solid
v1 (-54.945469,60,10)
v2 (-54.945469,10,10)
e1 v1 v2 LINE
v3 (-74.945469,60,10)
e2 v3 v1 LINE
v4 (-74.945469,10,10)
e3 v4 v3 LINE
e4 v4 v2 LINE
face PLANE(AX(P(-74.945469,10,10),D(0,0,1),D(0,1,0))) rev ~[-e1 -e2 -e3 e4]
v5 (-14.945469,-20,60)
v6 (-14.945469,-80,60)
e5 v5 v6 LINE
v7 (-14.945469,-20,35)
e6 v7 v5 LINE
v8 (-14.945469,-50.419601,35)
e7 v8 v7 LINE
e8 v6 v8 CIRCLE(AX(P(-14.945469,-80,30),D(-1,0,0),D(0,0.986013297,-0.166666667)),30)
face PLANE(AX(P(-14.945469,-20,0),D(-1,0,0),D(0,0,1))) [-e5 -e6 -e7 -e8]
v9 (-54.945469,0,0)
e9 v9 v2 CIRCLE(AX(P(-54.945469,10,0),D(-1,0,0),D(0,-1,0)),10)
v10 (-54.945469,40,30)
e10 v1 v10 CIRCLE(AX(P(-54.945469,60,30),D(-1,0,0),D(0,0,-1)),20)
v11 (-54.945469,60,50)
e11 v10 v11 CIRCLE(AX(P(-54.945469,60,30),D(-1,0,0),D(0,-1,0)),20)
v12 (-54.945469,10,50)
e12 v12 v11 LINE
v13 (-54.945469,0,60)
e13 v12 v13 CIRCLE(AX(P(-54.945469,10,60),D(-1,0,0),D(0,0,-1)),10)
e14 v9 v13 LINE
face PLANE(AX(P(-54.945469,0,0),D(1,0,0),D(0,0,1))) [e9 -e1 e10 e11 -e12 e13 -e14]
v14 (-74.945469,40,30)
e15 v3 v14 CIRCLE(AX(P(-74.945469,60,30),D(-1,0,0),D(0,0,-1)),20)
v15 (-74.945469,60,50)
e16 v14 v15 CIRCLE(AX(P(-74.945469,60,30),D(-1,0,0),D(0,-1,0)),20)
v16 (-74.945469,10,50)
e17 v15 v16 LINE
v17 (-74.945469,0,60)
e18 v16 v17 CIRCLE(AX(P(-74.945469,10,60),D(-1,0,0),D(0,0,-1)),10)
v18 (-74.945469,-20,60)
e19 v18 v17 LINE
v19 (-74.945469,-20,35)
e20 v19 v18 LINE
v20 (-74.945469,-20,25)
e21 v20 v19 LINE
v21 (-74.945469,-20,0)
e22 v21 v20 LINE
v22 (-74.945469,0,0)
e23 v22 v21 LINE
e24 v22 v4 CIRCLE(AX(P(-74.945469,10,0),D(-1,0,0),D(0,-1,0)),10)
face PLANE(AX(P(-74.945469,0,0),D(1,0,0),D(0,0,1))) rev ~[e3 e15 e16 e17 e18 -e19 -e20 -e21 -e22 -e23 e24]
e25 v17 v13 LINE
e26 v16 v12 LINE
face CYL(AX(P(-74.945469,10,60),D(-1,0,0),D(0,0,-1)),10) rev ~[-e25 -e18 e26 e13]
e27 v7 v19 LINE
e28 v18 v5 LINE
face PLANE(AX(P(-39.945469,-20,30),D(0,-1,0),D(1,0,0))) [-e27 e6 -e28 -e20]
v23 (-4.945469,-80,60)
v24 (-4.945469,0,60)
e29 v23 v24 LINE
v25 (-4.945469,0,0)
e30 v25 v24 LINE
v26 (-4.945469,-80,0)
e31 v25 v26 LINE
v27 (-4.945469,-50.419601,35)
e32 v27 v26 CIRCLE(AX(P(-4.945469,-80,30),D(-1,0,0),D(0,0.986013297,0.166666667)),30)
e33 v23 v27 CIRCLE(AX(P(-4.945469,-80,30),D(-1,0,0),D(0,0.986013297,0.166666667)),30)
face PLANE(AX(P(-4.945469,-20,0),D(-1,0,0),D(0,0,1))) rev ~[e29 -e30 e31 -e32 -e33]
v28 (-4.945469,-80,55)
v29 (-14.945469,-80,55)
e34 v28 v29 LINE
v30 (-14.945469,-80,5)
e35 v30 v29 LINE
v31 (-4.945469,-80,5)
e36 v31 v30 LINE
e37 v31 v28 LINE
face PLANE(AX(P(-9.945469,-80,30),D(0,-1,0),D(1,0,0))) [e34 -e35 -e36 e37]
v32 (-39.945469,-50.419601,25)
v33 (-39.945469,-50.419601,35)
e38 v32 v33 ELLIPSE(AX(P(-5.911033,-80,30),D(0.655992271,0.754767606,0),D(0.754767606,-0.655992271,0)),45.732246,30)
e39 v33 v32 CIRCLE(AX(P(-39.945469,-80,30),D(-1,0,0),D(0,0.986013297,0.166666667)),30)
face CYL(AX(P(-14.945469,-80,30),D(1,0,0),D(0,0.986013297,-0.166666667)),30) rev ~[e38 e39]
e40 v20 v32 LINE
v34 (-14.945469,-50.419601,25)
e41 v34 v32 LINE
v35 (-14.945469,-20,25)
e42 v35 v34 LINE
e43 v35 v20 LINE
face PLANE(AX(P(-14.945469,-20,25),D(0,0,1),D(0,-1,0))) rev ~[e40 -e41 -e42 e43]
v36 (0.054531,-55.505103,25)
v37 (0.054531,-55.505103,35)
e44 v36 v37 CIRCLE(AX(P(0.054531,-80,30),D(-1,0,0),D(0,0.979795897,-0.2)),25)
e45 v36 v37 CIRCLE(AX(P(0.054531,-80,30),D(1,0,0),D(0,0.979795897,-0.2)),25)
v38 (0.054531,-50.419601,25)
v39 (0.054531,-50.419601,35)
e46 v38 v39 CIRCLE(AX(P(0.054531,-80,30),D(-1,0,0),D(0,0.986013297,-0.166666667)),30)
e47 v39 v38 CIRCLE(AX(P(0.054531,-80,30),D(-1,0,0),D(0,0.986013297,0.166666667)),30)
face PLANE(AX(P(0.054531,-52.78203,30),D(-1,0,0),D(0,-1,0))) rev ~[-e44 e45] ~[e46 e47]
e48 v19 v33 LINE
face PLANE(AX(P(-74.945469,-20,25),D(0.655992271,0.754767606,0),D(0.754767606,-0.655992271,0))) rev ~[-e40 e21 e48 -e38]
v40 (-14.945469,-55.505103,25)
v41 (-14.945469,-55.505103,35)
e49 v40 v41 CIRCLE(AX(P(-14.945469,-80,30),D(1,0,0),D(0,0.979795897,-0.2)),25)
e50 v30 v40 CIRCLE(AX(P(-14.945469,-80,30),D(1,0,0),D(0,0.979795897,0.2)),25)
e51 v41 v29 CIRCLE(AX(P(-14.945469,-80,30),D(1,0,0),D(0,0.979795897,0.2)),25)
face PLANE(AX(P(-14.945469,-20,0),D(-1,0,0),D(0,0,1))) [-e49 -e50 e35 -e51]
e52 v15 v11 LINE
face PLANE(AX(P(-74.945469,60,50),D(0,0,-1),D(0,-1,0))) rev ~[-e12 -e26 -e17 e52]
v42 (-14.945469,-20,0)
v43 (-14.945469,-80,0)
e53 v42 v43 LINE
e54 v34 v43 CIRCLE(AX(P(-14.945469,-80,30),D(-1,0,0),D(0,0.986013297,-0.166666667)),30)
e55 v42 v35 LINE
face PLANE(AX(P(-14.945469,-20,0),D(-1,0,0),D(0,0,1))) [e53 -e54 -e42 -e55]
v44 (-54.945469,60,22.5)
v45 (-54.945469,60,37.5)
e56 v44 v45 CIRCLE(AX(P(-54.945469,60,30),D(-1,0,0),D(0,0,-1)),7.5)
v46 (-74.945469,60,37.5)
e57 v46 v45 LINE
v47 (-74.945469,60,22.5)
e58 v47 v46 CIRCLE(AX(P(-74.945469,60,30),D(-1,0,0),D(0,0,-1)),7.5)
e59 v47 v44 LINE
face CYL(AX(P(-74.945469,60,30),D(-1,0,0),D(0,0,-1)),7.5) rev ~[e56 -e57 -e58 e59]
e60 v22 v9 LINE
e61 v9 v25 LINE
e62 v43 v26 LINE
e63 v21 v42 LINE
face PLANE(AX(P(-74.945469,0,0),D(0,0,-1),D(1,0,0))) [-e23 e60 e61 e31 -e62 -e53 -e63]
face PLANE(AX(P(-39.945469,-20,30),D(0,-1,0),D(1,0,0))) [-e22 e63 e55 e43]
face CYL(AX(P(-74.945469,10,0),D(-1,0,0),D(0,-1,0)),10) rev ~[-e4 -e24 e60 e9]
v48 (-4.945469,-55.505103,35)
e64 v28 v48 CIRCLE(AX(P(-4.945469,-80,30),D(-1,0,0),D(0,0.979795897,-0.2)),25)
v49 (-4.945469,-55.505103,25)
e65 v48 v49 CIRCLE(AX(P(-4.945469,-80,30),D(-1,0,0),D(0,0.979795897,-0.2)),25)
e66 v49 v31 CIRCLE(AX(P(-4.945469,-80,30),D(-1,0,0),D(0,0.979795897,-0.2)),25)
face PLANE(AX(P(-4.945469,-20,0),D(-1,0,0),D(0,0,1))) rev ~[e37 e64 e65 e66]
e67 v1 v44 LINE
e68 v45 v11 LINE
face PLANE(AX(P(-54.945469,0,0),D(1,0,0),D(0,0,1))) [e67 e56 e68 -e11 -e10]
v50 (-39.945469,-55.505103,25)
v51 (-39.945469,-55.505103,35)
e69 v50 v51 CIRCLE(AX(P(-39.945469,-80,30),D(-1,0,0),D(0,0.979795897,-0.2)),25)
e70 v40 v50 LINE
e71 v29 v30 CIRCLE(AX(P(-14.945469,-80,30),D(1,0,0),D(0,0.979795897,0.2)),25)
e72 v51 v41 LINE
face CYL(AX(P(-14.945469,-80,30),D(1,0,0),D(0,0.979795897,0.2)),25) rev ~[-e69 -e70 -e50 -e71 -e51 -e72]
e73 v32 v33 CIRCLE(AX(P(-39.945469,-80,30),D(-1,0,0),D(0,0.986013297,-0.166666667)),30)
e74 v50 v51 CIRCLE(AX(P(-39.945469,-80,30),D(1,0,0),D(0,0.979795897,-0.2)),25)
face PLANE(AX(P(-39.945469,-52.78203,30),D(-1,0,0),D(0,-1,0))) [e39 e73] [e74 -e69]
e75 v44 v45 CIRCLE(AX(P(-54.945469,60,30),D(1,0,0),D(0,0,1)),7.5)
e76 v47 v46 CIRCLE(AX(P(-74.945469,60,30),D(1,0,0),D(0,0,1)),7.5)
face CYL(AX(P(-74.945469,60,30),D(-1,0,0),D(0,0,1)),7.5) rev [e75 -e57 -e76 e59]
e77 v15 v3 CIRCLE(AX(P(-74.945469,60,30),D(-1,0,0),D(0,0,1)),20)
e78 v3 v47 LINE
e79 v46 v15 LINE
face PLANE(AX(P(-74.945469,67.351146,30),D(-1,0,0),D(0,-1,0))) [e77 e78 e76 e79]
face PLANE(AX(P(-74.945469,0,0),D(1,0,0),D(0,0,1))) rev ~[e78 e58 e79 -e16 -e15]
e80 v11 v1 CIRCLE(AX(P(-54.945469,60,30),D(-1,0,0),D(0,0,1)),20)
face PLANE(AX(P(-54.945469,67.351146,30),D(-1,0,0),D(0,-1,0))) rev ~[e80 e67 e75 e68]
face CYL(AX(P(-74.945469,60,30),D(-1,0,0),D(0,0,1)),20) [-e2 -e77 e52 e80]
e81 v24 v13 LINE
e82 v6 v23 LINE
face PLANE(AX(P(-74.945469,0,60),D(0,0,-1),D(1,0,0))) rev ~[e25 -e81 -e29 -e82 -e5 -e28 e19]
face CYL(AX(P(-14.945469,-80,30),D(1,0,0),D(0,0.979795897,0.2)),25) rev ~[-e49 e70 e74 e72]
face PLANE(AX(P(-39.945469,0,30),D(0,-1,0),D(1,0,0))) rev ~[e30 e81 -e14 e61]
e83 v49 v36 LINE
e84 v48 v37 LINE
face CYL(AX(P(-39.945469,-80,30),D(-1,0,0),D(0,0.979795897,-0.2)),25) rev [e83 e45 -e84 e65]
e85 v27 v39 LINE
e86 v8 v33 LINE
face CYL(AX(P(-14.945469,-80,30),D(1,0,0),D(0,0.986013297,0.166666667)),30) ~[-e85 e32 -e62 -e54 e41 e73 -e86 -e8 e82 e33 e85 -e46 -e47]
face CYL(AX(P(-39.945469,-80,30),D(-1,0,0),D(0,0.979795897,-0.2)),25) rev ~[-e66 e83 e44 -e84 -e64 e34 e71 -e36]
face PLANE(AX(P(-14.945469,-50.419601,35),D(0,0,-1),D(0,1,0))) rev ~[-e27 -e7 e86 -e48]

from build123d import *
from build123d import SkipClean  # not in build123d's __all__

# Parameters (mm, degrees)
F0_W      = 70
F0_H      = 60
F8_DEPTH  = 20
F1_W      = 10
F1_H      = 60
F9_DEPTH  = 60
F10_DEPTH = 25
F3_DEPTH  = 40
F4_DEPTH  = 60
F11_DEPTH = 109.889773652
F6_W      = 20
F6_H      = 60
F12_DEPTH = 60
F14_DEPTH = 25
F7_DEPTH  = 20


with BuildPart() as f8:
    # F0 (on Front) → F8 (new body)
    with BuildSketch(Plane.XZ):
        with Locations((-39.945468749, 30)):
            Rectangle(F0_W, F0_H)
    extrude(amount=F8_DEPTH)

    # F1 (on face) → F9 (join)
    with BuildSketch(Plane.XZ.offset(20)):
        with Locations((-9.945468749, 30)):
            Rectangle(F1_W, F1_H)
    extrude(amount=F9_DEPTH)

    # F2 (on face) → F10 (join)
    with BuildSketch(Plane(origin=(-14.945468749, 0, 0), x_dir=(0, -1, 0), z_dir=(-1, 0, 0))):
        with BuildLine():
            Line((55.5051025722, 35), (50.4196010845, 35))
            ThreePointArc((50.4196010845, 35), (50, 30), (50.4196010845, 25))
            Line((50.4196010845, 25), (55.5051025722, 25))
            ThreePointArc((55.5051025722, 25), (55, 30), (55.5051025722, 35))
        make_face()
        with BuildLine():
            Line((55.5051025722, 25), (50.4196010845, 25))
            ThreePointArc((50.4196010845, 25), (60.635083269, 7.0871215252), (80, 0))
            Line((80, 0), (80, 5))
            ThreePointArc((80, 5), (64.1886116992, 10.635083269), (55.5051025722, 25))
        make_face()
        with BuildLine():
            ThreePointArc((80, 60), (60.635083269, 52.9128784748), (50.4196010845, 35))
            Line((50.4196010845, 35), (55.5051025722, 35))
            ThreePointArc((55.5051025722, 35), (64.1886116992, 49.364916731), (80, 55))
            Line((80, 55), (80, 60))
        make_face()
        with BuildLine():
            ThreePointArc((110, 30), (101.2132034356, 51.2132034356), (80, 60))
            Line((80, 60), (80, 55))
            ThreePointArc((80, 55), (97.6776695297, 47.6776695297), (105, 30))
            ThreePointArc((105, 30), (97.6776695297, 12.3223304703), (80, 5))
            Line((80, 5), (80, 0))
            ThreePointArc((80, 0), (101.2132034356, 8.7867965644), (110, 30))
        make_face()
    extrude(amount=F10_DEPTH)

    # F3 (add): a face of the model
    f3_faces = [f8.faces().sort_by_distance(p)[0] for p in [
        (-39.945468749, -80, 4.1514718626),
    ]]
    extrude(f3_faces, amount=-F3_DEPTH)

    # F2 (on face) → F4 (join)
    with BuildSketch(Plane(origin=(-14.945468749, 0, 0), x_dir=(0, -1, 0), z_dir=(-1, 0, 0))):
        with BuildLine():
            Line((50.4196010845, 35), (20, 35))
            Line((20, 35), (20, 25))
            Line((20, 25), (50.4196010845, 25))
            ThreePointArc((50.4196010845, 25), (50, 30), (50.4196010845, 35))
        make_face()
    extrude(amount=F4_DEPTH)

    # F5 (on face) → F11 (cut)
    with BuildSketch(Plane(origin=(0, 0, 25), x_dir=(1, 0, 0), z_dir=(0, 0, -1))):
        Polygon((-74.945468749, 50.4196010845), (-74.945468749, 20), (-39.945468749, 50.4196010845), align=None)
    extrude(amount=-F11_DEPTH, mode=Mode.SUBTRACT)

    # F6 (on face) → F12 (join)
    with BuildSketch(Plane.XZ):
        with Locations((-64.945468749, 30)):
            Rectangle(F6_W, F6_H)
    extrude(amount=-F12_DEPTH)

    # F13 (on face) → F14 (cut)
    with BuildSketch(Plane(origin=(-74.945468749, 0, 0), x_dir=(0, -1, 0), z_dir=(-1, 0, 0))):
        with BuildLine():
            Line((0, 60), (-20, 60))
            ThreePointArc((-20, 60), (-17.0710678119, 52.9289321881), (-10, 50))
            ThreePointArc((-10, 50), (-2.9289321881, 52.9289321881), (0, 60))
        make_face()
        with BuildLine():
            Line((-10, 10), (-60, 10))
            Line((-60, 10), (-60, 0))
            Line((-60, 0), (-20, 0))
            ThreePointArc((-20, 0), (-17.0710678119, 7.0710678119), (-10, 10))
        make_face()
        with BuildLine():
            ThreePointArc((0, 0), (-2.9289321881, 7.0710678119), (-10, 10))
            ThreePointArc((-10, 10), (-17.0710678119, 7.0710678119), (-20, 0))
            Line((-20, 0), (0, 0))
        make_face()
        with BuildLine():
            ThreePointArc((-10, 50), (-17.0710678119, 52.9289321881), (-20, 60))
            Line((-20, 60), (-60, 60))
            Line((-60, 60), (-60, 50))
            Line((-60, 50), (-10, 50))
        make_face()
        with BuildLine():
            ThreePointArc((-52.5, 30), (-54.6966991411, 35.3033008589), (-60, 37.5))
            Line((-60, 37.5), (-60, 22.5))
            ThreePointArc((-60, 22.5), (-54.6966991411, 24.6966991411), (-52.5, 30))
        make_face()
    extrude(amount=-F14_DEPTH, mode=Mode.SUBTRACT)

    # F13 (on face) → F7 (join)
    with BuildSketch(Plane(origin=(-74.945468749, 0, 0), x_dir=(0, -1, 0), z_dir=(-1, 0, 0))):
        with BuildLine():
            Line((-60, 37.5), (-60, 50))
            ThreePointArc((-60, 50), (-80, 30), (-60, 10))
            Line((-60, 10), (-60, 22.5))
            ThreePointArc((-60, 22.5), (-67.5, 30), (-60, 37.5))
        make_face()
        with BuildLine():
            ThreePointArc((-40, 30), (-45.8578643763, 44.1421356237), (-60, 50))
            Line((-60, 50), (-60, 37.5))
            ThreePointArc((-60, 37.5), (-54.6966991411, 35.3033008589), (-52.5, 30))
            ThreePointArc((-52.5, 30), (-54.6966991411, 24.6966991411), (-60, 22.5))
            Line((-60, 22.5), (-60, 10))
            ThreePointArc((-60, 10), (-45.8578643763, 15.8578643763), (-40, 30))
        make_face()
    with SkipClean():  # cleaning this boolean's faces spoils the solid; the shape is the same uncleaned
        extrude(amount=-F7_DEPTH)


solid = f8.part
